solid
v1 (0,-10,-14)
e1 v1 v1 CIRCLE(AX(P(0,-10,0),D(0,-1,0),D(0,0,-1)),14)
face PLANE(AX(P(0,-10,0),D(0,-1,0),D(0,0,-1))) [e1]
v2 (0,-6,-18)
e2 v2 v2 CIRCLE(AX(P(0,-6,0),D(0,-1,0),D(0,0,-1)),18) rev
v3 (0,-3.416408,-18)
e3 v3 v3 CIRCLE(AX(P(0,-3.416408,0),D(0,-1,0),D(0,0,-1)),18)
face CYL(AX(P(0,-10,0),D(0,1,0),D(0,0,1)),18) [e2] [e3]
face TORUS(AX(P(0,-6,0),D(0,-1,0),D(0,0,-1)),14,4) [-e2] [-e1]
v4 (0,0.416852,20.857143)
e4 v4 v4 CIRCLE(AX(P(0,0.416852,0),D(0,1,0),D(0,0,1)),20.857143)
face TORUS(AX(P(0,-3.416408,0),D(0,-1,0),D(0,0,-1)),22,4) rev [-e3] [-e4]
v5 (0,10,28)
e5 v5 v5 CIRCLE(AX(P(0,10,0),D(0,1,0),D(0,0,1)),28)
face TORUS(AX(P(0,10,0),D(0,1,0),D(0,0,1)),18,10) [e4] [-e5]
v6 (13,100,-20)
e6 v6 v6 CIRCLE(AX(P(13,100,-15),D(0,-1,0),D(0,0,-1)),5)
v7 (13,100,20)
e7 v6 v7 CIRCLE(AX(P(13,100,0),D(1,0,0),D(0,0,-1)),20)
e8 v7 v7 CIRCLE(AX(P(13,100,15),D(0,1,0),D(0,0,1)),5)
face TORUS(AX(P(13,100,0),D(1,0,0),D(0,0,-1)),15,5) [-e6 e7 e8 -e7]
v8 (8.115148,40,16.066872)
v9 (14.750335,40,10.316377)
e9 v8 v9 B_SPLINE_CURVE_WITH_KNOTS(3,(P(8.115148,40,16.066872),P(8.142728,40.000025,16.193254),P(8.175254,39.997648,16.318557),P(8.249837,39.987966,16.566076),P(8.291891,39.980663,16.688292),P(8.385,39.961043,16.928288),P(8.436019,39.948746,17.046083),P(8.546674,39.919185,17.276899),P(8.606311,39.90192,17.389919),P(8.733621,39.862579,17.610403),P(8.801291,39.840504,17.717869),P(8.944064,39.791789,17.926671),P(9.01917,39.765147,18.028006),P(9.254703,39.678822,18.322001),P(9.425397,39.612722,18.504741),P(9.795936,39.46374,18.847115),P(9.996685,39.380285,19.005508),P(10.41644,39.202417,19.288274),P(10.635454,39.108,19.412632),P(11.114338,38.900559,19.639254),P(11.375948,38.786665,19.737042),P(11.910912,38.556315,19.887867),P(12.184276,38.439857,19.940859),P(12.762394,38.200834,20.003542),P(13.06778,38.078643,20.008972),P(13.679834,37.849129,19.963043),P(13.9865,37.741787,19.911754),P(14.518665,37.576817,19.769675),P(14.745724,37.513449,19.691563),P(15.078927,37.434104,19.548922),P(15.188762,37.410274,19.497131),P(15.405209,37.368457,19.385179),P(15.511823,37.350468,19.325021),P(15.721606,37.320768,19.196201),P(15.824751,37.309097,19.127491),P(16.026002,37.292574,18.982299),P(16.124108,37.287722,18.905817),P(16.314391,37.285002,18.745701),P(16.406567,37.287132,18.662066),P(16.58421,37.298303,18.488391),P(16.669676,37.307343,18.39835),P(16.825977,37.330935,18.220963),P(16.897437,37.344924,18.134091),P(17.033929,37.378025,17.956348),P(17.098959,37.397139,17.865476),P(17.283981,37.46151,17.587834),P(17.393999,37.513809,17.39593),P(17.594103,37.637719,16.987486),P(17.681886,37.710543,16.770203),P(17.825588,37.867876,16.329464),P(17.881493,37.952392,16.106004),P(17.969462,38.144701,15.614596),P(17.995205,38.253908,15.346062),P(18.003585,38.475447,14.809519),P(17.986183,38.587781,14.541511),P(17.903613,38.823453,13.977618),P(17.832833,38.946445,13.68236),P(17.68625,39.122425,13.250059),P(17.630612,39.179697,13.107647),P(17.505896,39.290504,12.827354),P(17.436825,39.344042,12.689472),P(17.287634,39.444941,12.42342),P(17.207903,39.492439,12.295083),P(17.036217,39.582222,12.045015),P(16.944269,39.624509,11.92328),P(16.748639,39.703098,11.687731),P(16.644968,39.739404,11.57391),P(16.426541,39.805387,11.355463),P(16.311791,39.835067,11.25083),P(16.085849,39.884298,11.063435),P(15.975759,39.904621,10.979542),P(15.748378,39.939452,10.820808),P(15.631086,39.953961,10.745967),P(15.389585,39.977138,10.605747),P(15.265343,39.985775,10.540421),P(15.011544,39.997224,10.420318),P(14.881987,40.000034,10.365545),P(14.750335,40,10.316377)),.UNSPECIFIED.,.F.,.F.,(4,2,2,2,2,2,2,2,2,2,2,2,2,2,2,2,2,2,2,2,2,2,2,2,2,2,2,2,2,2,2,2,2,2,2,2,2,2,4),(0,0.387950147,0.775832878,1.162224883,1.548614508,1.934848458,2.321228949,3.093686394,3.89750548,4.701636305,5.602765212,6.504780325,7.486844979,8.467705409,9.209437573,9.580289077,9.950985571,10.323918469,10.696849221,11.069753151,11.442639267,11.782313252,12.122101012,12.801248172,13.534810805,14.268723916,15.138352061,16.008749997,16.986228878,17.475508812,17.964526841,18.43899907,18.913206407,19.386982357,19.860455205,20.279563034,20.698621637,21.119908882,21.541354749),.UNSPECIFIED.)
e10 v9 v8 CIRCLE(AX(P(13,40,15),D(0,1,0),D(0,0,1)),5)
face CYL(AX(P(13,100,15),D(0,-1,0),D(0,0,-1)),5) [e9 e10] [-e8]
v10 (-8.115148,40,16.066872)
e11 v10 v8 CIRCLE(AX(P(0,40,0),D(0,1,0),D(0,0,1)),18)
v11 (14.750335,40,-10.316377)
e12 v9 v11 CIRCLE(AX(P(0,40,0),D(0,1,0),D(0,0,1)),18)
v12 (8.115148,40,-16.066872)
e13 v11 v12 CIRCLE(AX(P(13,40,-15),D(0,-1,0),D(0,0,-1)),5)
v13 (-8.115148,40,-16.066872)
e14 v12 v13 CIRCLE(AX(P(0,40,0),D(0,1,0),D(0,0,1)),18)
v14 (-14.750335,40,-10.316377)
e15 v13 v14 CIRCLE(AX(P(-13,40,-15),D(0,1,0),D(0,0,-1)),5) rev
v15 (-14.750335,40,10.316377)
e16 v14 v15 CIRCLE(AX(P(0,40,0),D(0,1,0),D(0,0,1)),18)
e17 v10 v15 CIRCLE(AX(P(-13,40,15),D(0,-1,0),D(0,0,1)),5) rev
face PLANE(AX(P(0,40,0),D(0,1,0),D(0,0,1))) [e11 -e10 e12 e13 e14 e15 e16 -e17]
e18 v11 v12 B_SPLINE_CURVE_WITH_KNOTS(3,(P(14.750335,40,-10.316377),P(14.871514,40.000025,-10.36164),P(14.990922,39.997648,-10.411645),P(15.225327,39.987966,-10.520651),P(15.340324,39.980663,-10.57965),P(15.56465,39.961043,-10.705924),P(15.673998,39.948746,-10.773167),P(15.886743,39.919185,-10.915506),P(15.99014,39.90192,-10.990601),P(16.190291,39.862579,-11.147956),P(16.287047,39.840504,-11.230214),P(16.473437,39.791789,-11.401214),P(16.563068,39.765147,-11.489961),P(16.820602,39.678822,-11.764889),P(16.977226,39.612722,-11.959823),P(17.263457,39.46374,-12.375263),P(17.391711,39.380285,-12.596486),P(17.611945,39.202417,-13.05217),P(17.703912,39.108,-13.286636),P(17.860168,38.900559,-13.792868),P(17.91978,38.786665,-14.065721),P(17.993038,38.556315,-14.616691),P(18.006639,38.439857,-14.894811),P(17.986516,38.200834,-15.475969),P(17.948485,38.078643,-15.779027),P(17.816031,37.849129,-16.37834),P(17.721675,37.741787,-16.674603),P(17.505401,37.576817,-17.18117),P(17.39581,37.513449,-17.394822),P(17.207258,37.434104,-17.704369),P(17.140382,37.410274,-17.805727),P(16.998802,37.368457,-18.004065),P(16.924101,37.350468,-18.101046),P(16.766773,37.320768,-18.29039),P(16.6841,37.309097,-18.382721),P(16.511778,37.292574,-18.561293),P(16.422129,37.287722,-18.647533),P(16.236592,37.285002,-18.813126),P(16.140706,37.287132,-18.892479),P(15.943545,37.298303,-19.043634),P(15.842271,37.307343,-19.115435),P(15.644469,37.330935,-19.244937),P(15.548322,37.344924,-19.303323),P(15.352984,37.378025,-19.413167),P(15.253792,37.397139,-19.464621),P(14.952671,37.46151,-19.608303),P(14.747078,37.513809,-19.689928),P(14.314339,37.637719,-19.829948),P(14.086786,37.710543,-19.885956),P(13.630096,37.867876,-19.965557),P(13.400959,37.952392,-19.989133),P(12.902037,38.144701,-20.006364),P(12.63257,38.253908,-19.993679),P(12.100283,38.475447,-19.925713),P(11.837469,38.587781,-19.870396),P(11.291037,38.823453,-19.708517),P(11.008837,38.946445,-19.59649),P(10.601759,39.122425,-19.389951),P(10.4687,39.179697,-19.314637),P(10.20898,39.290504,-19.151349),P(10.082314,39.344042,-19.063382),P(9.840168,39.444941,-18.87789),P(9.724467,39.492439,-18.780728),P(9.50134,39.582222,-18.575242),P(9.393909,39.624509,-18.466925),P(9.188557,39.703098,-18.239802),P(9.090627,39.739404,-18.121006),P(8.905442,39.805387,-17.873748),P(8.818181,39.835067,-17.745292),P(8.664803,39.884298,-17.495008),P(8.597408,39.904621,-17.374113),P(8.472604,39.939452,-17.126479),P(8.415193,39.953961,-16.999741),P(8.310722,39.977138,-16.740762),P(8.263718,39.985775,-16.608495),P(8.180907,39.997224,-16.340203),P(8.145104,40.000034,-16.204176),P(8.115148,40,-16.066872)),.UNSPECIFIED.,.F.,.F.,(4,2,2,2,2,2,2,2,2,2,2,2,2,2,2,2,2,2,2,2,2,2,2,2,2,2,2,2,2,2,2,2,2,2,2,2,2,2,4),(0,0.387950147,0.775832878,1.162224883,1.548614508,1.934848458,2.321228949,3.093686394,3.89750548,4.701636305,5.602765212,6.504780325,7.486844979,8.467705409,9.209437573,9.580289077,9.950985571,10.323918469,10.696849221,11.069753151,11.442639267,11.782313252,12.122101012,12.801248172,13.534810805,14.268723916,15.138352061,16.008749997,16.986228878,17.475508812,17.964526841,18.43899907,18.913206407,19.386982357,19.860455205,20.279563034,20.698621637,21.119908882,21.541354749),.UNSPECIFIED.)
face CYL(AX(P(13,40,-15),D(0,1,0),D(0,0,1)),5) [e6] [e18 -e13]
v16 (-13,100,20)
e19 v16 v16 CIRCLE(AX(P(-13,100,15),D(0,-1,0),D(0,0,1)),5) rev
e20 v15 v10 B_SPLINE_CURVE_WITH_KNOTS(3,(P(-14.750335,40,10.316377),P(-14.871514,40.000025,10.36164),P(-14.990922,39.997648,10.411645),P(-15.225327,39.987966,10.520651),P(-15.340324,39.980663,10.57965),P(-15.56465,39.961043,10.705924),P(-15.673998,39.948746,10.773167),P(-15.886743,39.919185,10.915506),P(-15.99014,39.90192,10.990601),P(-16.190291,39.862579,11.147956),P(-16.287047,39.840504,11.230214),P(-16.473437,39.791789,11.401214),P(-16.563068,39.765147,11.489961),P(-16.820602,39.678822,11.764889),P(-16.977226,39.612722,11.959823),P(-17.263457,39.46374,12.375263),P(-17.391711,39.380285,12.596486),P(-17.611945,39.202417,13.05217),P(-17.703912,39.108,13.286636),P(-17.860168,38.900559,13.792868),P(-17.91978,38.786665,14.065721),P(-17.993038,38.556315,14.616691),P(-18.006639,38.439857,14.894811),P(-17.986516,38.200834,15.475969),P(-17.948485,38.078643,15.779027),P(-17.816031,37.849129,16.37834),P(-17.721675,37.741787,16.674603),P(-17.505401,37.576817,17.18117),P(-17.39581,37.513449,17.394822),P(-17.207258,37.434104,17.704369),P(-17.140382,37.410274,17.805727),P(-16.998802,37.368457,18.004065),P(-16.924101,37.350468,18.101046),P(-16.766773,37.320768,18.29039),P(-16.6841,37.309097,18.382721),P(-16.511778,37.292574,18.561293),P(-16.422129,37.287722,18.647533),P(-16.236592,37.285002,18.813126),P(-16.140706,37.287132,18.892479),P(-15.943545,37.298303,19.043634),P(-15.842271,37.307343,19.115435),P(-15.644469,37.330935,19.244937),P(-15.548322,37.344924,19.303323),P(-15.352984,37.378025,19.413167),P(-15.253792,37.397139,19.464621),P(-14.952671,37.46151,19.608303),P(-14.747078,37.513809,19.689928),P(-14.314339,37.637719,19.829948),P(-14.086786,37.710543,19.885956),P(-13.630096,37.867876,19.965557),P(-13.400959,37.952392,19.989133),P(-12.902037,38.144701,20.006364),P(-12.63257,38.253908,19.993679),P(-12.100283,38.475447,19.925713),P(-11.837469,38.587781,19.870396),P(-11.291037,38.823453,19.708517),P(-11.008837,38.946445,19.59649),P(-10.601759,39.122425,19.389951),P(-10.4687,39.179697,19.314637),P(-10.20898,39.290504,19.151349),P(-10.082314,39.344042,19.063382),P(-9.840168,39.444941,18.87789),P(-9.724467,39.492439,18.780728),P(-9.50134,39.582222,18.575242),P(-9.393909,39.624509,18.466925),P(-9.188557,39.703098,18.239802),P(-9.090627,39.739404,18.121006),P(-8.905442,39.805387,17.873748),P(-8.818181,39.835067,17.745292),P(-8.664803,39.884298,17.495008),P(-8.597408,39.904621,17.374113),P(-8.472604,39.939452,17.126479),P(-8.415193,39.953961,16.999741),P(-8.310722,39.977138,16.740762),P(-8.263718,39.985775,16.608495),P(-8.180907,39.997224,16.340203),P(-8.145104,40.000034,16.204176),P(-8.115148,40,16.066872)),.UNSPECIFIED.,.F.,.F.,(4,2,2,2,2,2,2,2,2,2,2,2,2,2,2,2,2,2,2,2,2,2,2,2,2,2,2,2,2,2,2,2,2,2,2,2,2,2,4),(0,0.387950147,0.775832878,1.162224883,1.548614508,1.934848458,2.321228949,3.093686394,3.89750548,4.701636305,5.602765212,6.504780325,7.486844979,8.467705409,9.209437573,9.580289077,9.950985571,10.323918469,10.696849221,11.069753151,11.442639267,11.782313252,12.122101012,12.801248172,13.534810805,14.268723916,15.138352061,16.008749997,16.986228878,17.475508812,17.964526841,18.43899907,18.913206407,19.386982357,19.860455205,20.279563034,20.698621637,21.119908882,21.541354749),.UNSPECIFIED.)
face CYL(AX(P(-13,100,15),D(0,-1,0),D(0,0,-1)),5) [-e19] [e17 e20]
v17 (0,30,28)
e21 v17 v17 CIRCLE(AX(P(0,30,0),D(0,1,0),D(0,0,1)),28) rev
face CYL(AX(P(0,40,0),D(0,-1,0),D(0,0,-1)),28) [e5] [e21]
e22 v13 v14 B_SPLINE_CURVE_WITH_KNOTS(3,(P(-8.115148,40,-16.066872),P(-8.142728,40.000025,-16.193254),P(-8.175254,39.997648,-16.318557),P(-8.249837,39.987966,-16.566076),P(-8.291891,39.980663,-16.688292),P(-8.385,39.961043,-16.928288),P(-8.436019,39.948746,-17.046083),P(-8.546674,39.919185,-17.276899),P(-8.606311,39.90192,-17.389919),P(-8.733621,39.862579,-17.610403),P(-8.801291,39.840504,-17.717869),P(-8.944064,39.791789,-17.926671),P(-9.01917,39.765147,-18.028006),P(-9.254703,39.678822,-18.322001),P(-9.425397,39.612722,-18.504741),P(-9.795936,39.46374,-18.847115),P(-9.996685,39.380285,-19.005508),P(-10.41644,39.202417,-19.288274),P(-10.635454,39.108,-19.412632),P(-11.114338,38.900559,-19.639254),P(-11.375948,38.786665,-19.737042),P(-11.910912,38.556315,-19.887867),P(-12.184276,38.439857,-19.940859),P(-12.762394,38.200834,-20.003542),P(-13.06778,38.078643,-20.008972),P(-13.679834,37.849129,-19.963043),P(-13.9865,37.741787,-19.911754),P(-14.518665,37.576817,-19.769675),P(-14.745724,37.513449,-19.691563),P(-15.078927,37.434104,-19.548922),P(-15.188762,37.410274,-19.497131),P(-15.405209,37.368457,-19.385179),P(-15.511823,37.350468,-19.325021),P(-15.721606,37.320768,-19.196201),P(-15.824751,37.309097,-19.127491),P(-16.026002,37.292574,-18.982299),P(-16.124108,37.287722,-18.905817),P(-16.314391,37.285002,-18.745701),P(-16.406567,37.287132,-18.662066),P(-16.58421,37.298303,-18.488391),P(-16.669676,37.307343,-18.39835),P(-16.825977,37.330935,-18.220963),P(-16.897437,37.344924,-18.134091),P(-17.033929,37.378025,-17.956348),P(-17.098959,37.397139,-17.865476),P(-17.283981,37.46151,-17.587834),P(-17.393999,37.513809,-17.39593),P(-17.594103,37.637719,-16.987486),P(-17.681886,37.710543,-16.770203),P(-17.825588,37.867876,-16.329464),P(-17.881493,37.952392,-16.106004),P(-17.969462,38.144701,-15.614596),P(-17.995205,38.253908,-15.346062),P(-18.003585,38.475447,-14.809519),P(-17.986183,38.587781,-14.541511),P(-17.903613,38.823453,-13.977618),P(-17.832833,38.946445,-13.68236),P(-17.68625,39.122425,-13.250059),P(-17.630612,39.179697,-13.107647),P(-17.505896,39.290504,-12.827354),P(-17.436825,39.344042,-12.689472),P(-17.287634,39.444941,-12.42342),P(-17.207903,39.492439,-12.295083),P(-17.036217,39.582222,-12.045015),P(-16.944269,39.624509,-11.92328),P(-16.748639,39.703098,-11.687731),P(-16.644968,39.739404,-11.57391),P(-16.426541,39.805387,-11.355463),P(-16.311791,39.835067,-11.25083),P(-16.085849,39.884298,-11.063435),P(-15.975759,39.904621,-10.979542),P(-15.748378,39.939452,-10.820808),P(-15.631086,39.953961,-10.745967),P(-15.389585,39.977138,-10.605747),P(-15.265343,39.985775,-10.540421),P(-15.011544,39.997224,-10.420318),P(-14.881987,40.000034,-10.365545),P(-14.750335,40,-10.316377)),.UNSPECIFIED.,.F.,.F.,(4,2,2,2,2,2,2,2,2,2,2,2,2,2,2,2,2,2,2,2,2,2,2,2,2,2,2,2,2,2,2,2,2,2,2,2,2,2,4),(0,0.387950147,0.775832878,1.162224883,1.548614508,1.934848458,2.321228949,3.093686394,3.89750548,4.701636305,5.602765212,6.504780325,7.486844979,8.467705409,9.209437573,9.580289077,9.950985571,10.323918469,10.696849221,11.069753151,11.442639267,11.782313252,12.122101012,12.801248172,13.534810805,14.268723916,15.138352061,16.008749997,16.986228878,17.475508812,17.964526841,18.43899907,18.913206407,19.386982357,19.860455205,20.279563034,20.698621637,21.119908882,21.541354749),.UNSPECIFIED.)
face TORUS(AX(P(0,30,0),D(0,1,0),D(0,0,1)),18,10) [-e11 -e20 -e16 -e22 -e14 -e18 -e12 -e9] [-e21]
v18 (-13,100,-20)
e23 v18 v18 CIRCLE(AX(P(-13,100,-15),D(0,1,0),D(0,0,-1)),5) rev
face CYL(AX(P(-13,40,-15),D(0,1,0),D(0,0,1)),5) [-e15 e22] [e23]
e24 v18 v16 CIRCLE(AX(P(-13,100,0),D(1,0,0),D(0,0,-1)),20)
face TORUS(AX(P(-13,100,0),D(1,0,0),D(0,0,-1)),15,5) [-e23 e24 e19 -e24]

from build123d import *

# Parameters (mm, degrees)
SKETCH_1_R        = 28
EXTRUDE_1_DEPTH   = 40
SWEEP_1_PROFILE_R = 5
SKETCH_13_R       = 18
EXTRUDE_2_DEPTH   = 10
FILLET_1_R        = 10
FILLET_2_R        = 4


with BuildPart() as part:
    # 草图1 → 凸台-拉伸1 (new body)
    with BuildSketch(Plane(origin=(0, 0, 0), x_dir=(1, 0, 0), z_dir=(0, 1, 0))):
        with Locations(Location((0, 0, 0), (0, 0, 270))):
            Circle(SKETCH_1_R)
    extrude(amount=EXTRUDE_1_DEPTH)

    # 扫描1: sweep along a path in 草图2
    with BuildLine(Plane(origin=(13, 0, 0), x_dir=(0, 0, -1), z_dir=(1, 0, 0))) as sweep_1_path:
        Line((15, 40), (15, 100))
        ThreePointArc((15, 100), (0, 115), (-15, 100))
        Line((-15, 100), (-15, 40))
    # 扫描1 profile (on start of the path) → 扫描1 (sweep)
    with BuildSketch(Plane(origin=(13, 40, -15), x_dir=(0, 0, 1), z_dir=(0, 1, 0))):
        Circle(SWEEP_1_PROFILE_R)
    sweep_1 = sweep(path=sweep_1_path.line)

    # 镜向1: 扫描1 across plane
    add(sweep_1.mirror(Plane(origin=(0, 0, 0), x_dir=(0, 0, 1), z_dir=(1, 0, 0))))

    # 草图13 → 凸台-拉伸2 (add)
    with BuildSketch(Plane.XZ):
        with Locations(Location((0, 0, 0), (0, 0, 270))):
            Circle(SKETCH_13_R)
    extrude(amount=EXTRUDE_2_DEPTH)

    # 圆角1
    # the kernel refuses this fillet: 10 mm, written as the material it takes off along each edge
    with BuildSketch(Plane(origin=(0, 0, 0), x_dir=(0, 0, 1), z_dir=(-1, 0, 0))) as fillet_1_piece_1:
        with BuildLine():
            CenterArc((28 - FILLET_1_R, FILLET_1_R), FILLET_1_R, 270, 90)
            Line((28 - FILLET_1_R, 0), (28, 0))
            Line((28, 0), (28, FILLET_1_R))
        make_face()
    revolve(axis=Axis((0, 0, 0), (0, 1, 0)), mode=Mode.SUBTRACT)
    with BuildSketch(Plane(origin=(0, 40, 0), x_dir=(0, 0, 1), z_dir=(-1, 0, 0))) as fillet_1_piece_2_section:
        with BuildLine():
            CenterArc((28 - FILLET_1_R, -FILLET_1_R), FILLET_1_R, 0, 90)
            Line((28 - FILLET_1_R, 0), (28, 0))
            Line((28, 0), (28, -FILLET_1_R))
        make_face()
    fillet_1_piece_2 = revolve(axis=Axis((0, 40, 0), (0, 1, 0)), mode=Mode.PRIVATE)
    fillet_1_piece_2 = fillet_1_piece_2 - Plane(origin=(-13, 37.182499818, 15), x_dir=(0, 0, -1), z_dir=(0, -1, 0)) * Cylinder(5, 112, mode=Mode.PRIVATE)
    fillet_1_piece_2 = fillet_1_piece_2 - Plane(origin=(13, 37.182499818, 15), x_dir=(0, 0, -1), z_dir=(0, -1, 0)) * Cylinder(5, 112, mode=Mode.PRIVATE)
    fillet_1_piece_2 = fillet_1_piece_2 - Plane(origin=(-13, 37.182499818, -15), x_dir=(0, 0, 1), z_dir=(0, 1, 0)) * Cylinder(5, 112, mode=Mode.PRIVATE)
    fillet_1_piece_2 = fillet_1_piece_2 - Plane(origin=(13, 37.182499818, -15), x_dir=(0, 0, 1), z_dir=(0, 1, 0)) * Cylinder(5, 112, mode=Mode.PRIVATE)
    add(fillet_1_piece_2, mode=Mode.SUBTRACT)

    # 圆角2
    fillet_2_edges = [part.edges().sort_by_distance(p)[0] for p in [
        (18, 0, 0),
        (0, -10, 18),
    ]]
    fillet(fillet_2_edges, radius=FILLET_2_R)


solid = part.part
